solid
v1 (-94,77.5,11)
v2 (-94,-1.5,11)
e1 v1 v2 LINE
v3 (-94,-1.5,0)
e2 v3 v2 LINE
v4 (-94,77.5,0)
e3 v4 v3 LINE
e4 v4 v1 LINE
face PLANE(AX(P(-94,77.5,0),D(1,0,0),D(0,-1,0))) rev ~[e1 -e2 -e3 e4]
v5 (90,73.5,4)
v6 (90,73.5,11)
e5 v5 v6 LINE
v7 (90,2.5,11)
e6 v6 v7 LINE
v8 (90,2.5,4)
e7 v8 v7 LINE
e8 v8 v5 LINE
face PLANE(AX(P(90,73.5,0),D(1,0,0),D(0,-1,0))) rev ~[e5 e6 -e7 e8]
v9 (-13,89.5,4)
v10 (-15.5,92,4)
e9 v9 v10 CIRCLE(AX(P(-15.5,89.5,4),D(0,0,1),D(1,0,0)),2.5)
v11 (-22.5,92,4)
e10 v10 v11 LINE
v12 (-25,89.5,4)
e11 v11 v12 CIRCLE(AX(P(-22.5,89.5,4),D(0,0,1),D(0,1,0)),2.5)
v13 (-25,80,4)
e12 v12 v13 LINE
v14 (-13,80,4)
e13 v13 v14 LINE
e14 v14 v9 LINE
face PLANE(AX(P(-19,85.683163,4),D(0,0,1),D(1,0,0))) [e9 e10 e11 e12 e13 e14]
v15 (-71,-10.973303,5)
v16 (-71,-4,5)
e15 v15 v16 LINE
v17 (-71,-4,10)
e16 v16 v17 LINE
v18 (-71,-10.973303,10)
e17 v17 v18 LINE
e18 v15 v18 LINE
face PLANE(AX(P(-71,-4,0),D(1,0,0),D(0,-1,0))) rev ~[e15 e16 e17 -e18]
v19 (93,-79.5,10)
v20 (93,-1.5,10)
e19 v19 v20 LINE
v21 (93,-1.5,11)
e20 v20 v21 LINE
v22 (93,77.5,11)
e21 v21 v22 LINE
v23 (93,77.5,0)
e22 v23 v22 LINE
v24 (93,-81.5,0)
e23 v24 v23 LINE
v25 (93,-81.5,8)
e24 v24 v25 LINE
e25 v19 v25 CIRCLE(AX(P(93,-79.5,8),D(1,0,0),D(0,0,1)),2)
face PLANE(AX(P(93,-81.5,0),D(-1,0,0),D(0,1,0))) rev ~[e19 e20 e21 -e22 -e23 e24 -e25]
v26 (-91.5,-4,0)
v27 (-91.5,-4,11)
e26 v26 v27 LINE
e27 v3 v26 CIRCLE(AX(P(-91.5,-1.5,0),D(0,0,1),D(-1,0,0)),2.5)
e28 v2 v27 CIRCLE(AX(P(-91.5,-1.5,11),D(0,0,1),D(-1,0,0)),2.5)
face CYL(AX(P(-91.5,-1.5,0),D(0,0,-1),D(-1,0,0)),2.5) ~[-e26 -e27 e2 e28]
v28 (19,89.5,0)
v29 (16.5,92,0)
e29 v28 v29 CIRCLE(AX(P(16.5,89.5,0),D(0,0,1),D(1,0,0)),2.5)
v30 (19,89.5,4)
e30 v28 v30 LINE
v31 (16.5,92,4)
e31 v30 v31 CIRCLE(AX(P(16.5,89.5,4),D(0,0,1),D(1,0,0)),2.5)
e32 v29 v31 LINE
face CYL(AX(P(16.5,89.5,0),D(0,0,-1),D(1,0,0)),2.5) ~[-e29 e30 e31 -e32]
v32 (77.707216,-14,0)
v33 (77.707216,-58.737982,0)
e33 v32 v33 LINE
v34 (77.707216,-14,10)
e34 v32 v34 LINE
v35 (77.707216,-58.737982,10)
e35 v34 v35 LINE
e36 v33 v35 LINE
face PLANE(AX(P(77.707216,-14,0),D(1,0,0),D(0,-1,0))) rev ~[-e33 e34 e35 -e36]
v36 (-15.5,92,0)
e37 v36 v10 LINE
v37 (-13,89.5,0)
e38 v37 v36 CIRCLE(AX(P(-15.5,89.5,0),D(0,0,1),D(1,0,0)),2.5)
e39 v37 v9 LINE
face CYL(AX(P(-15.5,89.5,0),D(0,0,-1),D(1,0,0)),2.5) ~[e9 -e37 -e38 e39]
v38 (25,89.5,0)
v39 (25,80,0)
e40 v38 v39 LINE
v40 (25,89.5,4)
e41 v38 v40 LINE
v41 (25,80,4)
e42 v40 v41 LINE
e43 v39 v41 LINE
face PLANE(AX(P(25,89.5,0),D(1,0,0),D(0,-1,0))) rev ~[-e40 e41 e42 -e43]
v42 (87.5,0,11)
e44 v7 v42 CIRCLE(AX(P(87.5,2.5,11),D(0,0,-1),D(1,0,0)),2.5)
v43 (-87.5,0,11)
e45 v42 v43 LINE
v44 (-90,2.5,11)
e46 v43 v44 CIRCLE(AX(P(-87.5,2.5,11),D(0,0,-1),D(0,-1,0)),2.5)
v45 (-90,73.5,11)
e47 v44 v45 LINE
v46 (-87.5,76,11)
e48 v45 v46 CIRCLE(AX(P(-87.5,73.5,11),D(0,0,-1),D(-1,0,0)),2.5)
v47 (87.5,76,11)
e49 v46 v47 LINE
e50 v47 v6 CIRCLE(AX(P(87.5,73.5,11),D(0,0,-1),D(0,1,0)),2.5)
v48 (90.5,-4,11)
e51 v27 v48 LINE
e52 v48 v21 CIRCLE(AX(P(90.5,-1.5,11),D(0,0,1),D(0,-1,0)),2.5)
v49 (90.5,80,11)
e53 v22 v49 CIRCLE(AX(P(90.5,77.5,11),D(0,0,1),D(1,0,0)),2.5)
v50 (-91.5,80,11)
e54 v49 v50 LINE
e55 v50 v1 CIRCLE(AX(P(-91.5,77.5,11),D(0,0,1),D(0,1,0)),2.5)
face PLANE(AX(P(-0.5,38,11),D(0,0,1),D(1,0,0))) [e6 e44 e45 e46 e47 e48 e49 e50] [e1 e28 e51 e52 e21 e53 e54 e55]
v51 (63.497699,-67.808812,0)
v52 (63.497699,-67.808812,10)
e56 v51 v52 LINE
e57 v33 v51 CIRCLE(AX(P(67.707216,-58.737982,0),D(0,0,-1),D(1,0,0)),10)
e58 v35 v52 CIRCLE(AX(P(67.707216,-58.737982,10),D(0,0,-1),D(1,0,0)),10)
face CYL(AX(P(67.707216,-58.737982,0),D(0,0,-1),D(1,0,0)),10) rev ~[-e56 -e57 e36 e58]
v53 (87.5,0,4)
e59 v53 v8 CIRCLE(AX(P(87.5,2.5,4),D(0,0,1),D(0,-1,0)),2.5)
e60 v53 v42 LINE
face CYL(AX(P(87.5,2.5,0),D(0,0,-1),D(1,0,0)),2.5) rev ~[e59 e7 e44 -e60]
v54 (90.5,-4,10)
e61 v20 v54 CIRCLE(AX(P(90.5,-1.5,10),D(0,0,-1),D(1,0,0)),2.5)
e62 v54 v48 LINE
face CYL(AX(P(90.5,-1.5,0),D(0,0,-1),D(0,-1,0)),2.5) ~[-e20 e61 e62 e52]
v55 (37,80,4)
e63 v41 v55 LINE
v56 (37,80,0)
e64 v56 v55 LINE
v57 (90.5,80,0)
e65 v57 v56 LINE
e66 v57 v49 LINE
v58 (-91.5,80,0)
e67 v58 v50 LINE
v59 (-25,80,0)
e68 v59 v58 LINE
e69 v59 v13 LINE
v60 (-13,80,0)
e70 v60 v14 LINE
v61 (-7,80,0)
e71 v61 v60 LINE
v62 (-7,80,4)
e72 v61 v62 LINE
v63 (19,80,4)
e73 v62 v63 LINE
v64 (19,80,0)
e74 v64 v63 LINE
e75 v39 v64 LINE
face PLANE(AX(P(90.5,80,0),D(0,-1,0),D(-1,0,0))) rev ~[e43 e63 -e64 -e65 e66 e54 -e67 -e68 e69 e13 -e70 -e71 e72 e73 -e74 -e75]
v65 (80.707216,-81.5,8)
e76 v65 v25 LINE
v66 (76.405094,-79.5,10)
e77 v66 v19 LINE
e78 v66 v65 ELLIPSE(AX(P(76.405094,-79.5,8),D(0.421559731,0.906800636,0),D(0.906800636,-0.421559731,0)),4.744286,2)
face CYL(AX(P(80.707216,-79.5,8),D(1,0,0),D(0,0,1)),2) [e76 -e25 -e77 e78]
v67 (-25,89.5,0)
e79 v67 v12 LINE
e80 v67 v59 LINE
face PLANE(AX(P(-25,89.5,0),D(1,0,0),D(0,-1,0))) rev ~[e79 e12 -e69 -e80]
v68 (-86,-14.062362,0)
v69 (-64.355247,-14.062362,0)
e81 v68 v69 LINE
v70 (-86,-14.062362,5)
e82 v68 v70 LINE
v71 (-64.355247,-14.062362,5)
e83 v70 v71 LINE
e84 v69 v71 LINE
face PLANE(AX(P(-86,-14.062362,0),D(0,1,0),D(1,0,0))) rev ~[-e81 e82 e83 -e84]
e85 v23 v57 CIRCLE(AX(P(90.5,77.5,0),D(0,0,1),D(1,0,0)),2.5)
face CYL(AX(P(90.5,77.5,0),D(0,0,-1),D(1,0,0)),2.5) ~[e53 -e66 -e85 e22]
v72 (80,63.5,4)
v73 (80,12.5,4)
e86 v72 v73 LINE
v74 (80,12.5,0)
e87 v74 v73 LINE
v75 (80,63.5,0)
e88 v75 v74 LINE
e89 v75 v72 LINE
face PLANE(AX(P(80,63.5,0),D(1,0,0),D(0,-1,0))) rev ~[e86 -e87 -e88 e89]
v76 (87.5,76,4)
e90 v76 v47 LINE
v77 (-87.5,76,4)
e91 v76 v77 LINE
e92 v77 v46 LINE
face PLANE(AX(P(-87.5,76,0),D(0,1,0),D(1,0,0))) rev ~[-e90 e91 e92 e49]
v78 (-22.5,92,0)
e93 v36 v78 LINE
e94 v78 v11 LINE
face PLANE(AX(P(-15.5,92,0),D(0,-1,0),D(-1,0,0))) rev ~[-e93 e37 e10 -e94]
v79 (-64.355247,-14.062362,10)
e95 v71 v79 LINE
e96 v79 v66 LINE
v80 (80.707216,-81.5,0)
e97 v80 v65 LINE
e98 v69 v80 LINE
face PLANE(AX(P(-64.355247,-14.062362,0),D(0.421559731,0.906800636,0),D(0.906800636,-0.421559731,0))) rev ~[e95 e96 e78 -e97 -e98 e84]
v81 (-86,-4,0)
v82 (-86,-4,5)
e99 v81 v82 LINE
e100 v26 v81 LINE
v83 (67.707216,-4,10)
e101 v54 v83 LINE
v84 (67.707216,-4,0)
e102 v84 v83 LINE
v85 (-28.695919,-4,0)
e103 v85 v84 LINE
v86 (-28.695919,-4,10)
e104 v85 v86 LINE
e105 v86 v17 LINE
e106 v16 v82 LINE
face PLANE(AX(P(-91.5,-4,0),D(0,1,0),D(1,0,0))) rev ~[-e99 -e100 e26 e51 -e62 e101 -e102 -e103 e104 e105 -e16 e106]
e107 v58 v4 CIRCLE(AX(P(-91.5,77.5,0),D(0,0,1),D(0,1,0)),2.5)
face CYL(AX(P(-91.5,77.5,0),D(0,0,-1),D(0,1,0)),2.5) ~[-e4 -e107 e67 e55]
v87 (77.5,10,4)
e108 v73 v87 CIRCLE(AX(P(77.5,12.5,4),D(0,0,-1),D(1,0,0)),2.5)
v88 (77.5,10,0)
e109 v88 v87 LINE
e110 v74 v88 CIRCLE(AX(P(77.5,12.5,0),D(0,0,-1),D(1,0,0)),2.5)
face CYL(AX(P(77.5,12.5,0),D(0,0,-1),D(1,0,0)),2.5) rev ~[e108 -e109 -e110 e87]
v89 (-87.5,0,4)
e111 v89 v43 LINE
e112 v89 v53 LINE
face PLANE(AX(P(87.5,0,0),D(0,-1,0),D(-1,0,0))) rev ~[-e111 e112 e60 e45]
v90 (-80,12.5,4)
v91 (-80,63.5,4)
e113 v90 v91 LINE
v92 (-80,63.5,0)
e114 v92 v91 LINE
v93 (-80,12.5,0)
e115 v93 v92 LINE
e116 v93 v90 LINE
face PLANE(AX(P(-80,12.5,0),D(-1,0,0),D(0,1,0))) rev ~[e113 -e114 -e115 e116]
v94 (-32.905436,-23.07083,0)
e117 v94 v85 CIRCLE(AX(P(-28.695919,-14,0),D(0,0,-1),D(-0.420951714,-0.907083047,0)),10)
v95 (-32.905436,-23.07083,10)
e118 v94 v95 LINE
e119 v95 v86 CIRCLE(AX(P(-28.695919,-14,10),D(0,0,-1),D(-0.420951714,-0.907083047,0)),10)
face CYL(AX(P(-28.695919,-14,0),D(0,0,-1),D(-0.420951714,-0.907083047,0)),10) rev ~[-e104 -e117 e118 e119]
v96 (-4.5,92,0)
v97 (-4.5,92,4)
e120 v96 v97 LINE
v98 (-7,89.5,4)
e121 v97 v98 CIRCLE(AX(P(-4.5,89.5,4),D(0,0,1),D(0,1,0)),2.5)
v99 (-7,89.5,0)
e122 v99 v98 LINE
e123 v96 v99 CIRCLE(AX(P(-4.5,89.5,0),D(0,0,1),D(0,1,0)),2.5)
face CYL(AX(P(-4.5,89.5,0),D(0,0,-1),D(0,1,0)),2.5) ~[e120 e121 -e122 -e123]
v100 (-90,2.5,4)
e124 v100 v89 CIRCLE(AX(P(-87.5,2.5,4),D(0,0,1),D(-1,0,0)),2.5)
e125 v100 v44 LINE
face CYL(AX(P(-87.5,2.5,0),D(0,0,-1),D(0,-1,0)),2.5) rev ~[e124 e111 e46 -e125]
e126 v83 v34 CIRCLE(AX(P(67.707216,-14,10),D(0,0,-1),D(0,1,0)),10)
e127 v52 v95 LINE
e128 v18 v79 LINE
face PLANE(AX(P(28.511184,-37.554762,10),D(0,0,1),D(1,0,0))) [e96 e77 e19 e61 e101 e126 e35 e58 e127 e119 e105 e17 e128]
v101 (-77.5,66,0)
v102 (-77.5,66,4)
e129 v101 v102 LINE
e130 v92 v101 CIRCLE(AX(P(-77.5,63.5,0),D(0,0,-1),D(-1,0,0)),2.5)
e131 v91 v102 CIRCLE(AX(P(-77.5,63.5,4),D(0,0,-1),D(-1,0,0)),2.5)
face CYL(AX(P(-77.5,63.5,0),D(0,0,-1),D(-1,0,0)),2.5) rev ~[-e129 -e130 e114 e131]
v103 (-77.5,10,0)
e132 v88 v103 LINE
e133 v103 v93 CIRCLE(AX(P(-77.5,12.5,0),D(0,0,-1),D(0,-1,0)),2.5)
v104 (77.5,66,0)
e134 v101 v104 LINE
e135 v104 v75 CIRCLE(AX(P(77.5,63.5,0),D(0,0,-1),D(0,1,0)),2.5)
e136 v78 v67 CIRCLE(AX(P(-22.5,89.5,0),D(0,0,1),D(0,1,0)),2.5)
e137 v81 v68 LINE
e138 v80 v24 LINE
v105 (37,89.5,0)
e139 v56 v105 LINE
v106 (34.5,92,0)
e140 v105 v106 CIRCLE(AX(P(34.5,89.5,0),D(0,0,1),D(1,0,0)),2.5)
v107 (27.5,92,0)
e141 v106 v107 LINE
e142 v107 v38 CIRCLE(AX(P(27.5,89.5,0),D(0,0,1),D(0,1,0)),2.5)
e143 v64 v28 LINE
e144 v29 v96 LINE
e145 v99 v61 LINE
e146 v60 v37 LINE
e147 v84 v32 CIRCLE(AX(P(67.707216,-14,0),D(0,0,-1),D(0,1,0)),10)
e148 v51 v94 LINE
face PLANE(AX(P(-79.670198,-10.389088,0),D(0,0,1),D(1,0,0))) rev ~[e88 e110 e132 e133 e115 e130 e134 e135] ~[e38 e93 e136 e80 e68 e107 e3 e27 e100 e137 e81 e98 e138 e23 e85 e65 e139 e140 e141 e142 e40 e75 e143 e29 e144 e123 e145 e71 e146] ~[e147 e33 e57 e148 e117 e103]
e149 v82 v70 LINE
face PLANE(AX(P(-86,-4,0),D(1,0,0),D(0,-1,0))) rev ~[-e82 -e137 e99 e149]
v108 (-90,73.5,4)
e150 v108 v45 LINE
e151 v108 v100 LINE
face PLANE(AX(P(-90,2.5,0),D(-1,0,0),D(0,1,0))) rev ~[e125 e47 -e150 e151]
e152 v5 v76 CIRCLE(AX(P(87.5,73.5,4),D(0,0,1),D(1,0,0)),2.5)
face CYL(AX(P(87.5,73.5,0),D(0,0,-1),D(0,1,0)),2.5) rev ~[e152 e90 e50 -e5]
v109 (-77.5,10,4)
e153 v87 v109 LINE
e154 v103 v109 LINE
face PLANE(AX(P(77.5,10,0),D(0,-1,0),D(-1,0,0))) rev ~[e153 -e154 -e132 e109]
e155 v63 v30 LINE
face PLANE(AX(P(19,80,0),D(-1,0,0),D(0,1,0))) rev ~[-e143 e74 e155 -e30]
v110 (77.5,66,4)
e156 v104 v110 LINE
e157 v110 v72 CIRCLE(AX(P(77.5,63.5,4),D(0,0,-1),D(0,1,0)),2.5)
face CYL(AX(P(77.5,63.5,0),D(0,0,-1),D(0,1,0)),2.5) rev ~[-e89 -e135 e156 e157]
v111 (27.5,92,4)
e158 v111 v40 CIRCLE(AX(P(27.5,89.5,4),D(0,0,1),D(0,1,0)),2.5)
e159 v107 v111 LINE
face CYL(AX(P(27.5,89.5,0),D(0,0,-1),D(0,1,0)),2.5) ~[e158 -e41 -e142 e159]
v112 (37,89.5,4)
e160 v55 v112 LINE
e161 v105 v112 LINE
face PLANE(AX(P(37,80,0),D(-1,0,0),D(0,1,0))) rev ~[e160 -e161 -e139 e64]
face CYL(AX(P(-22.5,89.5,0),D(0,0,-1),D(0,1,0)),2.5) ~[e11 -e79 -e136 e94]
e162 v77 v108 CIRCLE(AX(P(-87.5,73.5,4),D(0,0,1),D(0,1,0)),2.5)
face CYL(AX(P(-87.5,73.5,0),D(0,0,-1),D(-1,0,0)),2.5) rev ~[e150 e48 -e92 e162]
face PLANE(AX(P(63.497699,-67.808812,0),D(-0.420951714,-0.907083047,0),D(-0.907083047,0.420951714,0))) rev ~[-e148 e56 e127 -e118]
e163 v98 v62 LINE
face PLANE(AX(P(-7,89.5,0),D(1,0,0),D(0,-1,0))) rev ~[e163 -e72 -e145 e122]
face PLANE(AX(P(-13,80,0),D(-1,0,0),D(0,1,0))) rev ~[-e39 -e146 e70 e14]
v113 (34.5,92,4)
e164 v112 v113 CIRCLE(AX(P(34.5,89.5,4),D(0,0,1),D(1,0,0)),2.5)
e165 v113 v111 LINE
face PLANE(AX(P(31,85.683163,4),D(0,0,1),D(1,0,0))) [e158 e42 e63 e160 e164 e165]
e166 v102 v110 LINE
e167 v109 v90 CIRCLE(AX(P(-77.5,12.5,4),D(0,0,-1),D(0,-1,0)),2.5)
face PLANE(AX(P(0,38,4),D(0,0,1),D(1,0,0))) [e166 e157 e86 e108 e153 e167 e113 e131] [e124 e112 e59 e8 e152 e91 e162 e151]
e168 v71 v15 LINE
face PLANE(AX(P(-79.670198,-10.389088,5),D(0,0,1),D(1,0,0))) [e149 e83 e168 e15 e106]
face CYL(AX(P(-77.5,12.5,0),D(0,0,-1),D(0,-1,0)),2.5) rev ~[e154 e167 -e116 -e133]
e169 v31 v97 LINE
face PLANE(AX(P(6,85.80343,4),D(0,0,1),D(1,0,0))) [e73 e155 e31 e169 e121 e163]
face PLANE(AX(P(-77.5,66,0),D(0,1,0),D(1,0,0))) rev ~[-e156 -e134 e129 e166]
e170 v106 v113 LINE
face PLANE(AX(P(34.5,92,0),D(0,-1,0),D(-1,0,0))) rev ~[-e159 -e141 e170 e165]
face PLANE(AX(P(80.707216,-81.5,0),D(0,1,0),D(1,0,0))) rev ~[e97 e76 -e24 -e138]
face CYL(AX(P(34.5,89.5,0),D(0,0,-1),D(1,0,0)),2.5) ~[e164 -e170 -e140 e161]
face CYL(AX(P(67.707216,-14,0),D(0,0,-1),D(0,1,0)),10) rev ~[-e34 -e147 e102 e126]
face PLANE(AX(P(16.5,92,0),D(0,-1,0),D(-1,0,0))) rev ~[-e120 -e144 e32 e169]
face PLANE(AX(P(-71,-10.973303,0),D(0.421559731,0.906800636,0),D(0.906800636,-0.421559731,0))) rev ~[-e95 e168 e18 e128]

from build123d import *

# Parameters (mm, degrees)
F1_DEPTH = 11
F2_DEPTH = 4
F3_DEPTH = 10
F4_DEPTH = 5
F5_R     = 2


# Not quite as in the source:
# - a feature names something its author has since deleted; it is built from what else it names


with BuildPart() as f1:
    # F0 (on Top) → F1 (new body)
    with BuildSketch(Plane.XY):
        with BuildLine():
            ThreePointArc((93, 77.5), (92.267766953, 79.267766953), (90.5, 80))
            Line((90.5, 80), (37, 80))
            Line((37, 80), (25, 80))
            Line((25, 80), (19, 80))
            Line((19, 80), (-7, 80))
            Line((-7, 80), (-13, 80))
            Line((-13, 80), (-25, 80))
            Line((-25, 80), (-74, 80))
            Line((-74, 80), (-91.5, 80))
            ThreePointArc((-91.5, 80), (-93.267766953, 79.267766953), (-94, 77.5))
            Line((-94, 77.5), (-94, 76))
            Line((-94, 76), (-94, 0))
            Line((-94, 0), (-94, -1.5))
            ThreePointArc((-94, -1.5), (-93.267766953, -3.267766953), (-91.5, -4))
            Line((-91.5, -4), (-88, -4))
            Line((-88, -4), (-86, -4))
            Line((-86, -4), (-71, -4))
            Line((-71, -4), (-28.6959191337, -4))
            Line((-28.6959191337, -4), (67.7072161436, -4))
            Line((67.7072161436, -4), (88, -4))
            Line((88, -4), (90.5, -4))
            ThreePointArc((90.5, -4), (92.267766953, -3.267766953), (93, -1.5))
            Line((93, -1.5), (93, 0))
            Line((93, 0), (93, 76))
            Line((93, 76), (93, 77.5))
        make_face()
        with BuildLine():
            ThreePointArc((90, 2.5), (89.267766953, 0.732233047), (87.5, 0))
            Line((87.5, 0), (-87.5, 0))
            ThreePointArc((-87.5, 0), (-89.267766953, 0.732233047), (-90, 2.5))
            Line((-90, 2.5), (-90, 73.5))
            ThreePointArc((-90, 73.5), (-89.267766953, 75.267766953), (-87.5, 76))
            Line((-87.5, 76), (87.5, 76))
            ThreePointArc((87.5, 76), (89.267766953, 75.267766953), (90, 73.5))
            Line((90, 73.5), (90, 2.5))
        make_face(mode=Mode.SUBTRACT)
    extrude(amount=F1_DEPTH)

    # F0 (on Top) → F2 (join)
    with BuildSketch(Plane.XY):
        with BuildLine():
            Line((-87.5, 0), (87.5, 0))
            ThreePointArc((87.5, 0), (89.267766953, 0.732233047), (90, 2.5))
            Line((90, 2.5), (90, 73.5))
            ThreePointArc((90, 73.5), (89.267766953, 75.267766953), (87.5, 76))
            Line((87.5, 76), (-87.5, 76))
            ThreePointArc((-87.5, 76), (-89.267766953, 75.267766953), (-90, 73.5))
            Line((-90, 73.5), (-90, 2.5))
            ThreePointArc((-90, 2.5), (-89.267766953, 0.732233047), (-87.5, 0))
        make_face()
        with BuildLine():
            Line((-77.5, 66), (77.5, 66))
            ThreePointArc((77.5, 66), (79.267766953, 65.267766953), (80, 63.5))
            Line((80, 63.5), (80, 12.5))
            ThreePointArc((80, 12.5), (79.267766953, 10.732233047), (77.5, 10))
            Line((77.5, 10), (-77.5, 10))
            ThreePointArc((-77.5, 10), (-79.267766953, 10.732233047), (-80, 12.5))
            Line((-80, 12.5), (-80, 63.5))
            ThreePointArc((-80, 63.5), (-79.267766953, 65.267766953), (-77.5, 66))
        make_face(mode=Mode.SUBTRACT)
        with BuildLine():
            Line((-25, 80), (-13, 80))
            Line((-13, 80), (-13, 89.5))
            ThreePointArc((-13, 89.5), (-13.732233047, 91.267766953), (-15.5, 92))
            Line((-15.5, 92), (-22.5, 92))
            ThreePointArc((-22.5, 92), (-24.267766953, 91.267766953), (-25, 89.5))
            Line((-25, 89.5), (-25, 80))
        make_face()
        with BuildLine():
            Line((-7, 80), (19, 80))
            Line((19, 80), (19, 89.5))
            ThreePointArc((19, 89.5), (18.267766953, 91.267766953), (16.5, 92))
            Line((16.5, 92), (-4.5, 92))
            ThreePointArc((-4.5, 92), (-6.267766953, 91.267766953), (-7, 89.5))
            Line((-7, 89.5), (-7, 80))
        make_face()
        with BuildLine():
            Line((25, 80), (37, 80))
            Line((37, 80), (37, 89.5))
            ThreePointArc((37, 89.5), (36.267766953, 91.267766953), (34.5, 92))
            Line((34.5, 92), (27.5, 92))
            ThreePointArc((27.5, 92), (25.732233047, 91.267766953), (25, 89.5))
            Line((25, 89.5), (25, 80))
        make_face()
    extrude(amount=F2_DEPTH)

    # F0 (on Top) → F3 (join)
    with BuildSketch(Plane.XY):
        with BuildLine():
            Line((93, -81.5), (93, -1.5))
            ThreePointArc((93, -1.5), (92.267766953, -3.267766953), (90.5, -4))
            Line((90.5, -4), (88, -4))
            Line((88, -4), (67.7072161436, -4))
            ThreePointArc((67.7072161436, -4), (74.7782839555, -6.9289321881), (77.7072161436, -14))
            Line((77.7072161436, -14), (77.7072161436, -58.7379819401))
            ThreePointArc((77.7072161436, -58.7379819401), (73.0879609173, -67.1669549309), (63.4976990076, -67.8088124137))
            Line((63.4976990076, -67.8088124137), (-32.9054362697, -23.0708304737))
            ThreePointArc((-32.9054362697, -23.0708304737), (-38.4608642113, -11.8445771571), (-28.6959191337, -4))
            Line((-28.6959191337, -4), (-71, -4))
            Line((-71, -4), (-71, -10.9733034172))
            Line((-71, -10.9733034172), (-64.3552474564, -14.0623617917))
            Line((-64.3552474564, -14.0623617917), (80.7072161436, -81.5))
            Line((80.7072161436, -81.5), (93, -81.5))
        make_face()
    extrude(amount=F3_DEPTH)

    # F0 (on Top) → F4 (join)
    with BuildSketch(Plane.XY):
        Polygon((-71, -14.0623617917), (-71, -10.9733034172), (-86, -4), (-86, -14.0623617917), align=None)
        Polygon((-86, -4), (-71, -10.9733034172), (-71, -4), align=None)
        Polygon((-71, -14.0623617917), (-64.3552474564, -14.0623617917), (-71, -10.9733034172), align=None)
    extrude(amount=F4_DEPTH)

    # F5
    f5_edges = [f1.edges().sort_by_distance(p)[0] for p in [
        (86.853608, -81.5, 10),
    ]]
    fillet(f5_edges, radius=F5_R)


solid = f1.part
